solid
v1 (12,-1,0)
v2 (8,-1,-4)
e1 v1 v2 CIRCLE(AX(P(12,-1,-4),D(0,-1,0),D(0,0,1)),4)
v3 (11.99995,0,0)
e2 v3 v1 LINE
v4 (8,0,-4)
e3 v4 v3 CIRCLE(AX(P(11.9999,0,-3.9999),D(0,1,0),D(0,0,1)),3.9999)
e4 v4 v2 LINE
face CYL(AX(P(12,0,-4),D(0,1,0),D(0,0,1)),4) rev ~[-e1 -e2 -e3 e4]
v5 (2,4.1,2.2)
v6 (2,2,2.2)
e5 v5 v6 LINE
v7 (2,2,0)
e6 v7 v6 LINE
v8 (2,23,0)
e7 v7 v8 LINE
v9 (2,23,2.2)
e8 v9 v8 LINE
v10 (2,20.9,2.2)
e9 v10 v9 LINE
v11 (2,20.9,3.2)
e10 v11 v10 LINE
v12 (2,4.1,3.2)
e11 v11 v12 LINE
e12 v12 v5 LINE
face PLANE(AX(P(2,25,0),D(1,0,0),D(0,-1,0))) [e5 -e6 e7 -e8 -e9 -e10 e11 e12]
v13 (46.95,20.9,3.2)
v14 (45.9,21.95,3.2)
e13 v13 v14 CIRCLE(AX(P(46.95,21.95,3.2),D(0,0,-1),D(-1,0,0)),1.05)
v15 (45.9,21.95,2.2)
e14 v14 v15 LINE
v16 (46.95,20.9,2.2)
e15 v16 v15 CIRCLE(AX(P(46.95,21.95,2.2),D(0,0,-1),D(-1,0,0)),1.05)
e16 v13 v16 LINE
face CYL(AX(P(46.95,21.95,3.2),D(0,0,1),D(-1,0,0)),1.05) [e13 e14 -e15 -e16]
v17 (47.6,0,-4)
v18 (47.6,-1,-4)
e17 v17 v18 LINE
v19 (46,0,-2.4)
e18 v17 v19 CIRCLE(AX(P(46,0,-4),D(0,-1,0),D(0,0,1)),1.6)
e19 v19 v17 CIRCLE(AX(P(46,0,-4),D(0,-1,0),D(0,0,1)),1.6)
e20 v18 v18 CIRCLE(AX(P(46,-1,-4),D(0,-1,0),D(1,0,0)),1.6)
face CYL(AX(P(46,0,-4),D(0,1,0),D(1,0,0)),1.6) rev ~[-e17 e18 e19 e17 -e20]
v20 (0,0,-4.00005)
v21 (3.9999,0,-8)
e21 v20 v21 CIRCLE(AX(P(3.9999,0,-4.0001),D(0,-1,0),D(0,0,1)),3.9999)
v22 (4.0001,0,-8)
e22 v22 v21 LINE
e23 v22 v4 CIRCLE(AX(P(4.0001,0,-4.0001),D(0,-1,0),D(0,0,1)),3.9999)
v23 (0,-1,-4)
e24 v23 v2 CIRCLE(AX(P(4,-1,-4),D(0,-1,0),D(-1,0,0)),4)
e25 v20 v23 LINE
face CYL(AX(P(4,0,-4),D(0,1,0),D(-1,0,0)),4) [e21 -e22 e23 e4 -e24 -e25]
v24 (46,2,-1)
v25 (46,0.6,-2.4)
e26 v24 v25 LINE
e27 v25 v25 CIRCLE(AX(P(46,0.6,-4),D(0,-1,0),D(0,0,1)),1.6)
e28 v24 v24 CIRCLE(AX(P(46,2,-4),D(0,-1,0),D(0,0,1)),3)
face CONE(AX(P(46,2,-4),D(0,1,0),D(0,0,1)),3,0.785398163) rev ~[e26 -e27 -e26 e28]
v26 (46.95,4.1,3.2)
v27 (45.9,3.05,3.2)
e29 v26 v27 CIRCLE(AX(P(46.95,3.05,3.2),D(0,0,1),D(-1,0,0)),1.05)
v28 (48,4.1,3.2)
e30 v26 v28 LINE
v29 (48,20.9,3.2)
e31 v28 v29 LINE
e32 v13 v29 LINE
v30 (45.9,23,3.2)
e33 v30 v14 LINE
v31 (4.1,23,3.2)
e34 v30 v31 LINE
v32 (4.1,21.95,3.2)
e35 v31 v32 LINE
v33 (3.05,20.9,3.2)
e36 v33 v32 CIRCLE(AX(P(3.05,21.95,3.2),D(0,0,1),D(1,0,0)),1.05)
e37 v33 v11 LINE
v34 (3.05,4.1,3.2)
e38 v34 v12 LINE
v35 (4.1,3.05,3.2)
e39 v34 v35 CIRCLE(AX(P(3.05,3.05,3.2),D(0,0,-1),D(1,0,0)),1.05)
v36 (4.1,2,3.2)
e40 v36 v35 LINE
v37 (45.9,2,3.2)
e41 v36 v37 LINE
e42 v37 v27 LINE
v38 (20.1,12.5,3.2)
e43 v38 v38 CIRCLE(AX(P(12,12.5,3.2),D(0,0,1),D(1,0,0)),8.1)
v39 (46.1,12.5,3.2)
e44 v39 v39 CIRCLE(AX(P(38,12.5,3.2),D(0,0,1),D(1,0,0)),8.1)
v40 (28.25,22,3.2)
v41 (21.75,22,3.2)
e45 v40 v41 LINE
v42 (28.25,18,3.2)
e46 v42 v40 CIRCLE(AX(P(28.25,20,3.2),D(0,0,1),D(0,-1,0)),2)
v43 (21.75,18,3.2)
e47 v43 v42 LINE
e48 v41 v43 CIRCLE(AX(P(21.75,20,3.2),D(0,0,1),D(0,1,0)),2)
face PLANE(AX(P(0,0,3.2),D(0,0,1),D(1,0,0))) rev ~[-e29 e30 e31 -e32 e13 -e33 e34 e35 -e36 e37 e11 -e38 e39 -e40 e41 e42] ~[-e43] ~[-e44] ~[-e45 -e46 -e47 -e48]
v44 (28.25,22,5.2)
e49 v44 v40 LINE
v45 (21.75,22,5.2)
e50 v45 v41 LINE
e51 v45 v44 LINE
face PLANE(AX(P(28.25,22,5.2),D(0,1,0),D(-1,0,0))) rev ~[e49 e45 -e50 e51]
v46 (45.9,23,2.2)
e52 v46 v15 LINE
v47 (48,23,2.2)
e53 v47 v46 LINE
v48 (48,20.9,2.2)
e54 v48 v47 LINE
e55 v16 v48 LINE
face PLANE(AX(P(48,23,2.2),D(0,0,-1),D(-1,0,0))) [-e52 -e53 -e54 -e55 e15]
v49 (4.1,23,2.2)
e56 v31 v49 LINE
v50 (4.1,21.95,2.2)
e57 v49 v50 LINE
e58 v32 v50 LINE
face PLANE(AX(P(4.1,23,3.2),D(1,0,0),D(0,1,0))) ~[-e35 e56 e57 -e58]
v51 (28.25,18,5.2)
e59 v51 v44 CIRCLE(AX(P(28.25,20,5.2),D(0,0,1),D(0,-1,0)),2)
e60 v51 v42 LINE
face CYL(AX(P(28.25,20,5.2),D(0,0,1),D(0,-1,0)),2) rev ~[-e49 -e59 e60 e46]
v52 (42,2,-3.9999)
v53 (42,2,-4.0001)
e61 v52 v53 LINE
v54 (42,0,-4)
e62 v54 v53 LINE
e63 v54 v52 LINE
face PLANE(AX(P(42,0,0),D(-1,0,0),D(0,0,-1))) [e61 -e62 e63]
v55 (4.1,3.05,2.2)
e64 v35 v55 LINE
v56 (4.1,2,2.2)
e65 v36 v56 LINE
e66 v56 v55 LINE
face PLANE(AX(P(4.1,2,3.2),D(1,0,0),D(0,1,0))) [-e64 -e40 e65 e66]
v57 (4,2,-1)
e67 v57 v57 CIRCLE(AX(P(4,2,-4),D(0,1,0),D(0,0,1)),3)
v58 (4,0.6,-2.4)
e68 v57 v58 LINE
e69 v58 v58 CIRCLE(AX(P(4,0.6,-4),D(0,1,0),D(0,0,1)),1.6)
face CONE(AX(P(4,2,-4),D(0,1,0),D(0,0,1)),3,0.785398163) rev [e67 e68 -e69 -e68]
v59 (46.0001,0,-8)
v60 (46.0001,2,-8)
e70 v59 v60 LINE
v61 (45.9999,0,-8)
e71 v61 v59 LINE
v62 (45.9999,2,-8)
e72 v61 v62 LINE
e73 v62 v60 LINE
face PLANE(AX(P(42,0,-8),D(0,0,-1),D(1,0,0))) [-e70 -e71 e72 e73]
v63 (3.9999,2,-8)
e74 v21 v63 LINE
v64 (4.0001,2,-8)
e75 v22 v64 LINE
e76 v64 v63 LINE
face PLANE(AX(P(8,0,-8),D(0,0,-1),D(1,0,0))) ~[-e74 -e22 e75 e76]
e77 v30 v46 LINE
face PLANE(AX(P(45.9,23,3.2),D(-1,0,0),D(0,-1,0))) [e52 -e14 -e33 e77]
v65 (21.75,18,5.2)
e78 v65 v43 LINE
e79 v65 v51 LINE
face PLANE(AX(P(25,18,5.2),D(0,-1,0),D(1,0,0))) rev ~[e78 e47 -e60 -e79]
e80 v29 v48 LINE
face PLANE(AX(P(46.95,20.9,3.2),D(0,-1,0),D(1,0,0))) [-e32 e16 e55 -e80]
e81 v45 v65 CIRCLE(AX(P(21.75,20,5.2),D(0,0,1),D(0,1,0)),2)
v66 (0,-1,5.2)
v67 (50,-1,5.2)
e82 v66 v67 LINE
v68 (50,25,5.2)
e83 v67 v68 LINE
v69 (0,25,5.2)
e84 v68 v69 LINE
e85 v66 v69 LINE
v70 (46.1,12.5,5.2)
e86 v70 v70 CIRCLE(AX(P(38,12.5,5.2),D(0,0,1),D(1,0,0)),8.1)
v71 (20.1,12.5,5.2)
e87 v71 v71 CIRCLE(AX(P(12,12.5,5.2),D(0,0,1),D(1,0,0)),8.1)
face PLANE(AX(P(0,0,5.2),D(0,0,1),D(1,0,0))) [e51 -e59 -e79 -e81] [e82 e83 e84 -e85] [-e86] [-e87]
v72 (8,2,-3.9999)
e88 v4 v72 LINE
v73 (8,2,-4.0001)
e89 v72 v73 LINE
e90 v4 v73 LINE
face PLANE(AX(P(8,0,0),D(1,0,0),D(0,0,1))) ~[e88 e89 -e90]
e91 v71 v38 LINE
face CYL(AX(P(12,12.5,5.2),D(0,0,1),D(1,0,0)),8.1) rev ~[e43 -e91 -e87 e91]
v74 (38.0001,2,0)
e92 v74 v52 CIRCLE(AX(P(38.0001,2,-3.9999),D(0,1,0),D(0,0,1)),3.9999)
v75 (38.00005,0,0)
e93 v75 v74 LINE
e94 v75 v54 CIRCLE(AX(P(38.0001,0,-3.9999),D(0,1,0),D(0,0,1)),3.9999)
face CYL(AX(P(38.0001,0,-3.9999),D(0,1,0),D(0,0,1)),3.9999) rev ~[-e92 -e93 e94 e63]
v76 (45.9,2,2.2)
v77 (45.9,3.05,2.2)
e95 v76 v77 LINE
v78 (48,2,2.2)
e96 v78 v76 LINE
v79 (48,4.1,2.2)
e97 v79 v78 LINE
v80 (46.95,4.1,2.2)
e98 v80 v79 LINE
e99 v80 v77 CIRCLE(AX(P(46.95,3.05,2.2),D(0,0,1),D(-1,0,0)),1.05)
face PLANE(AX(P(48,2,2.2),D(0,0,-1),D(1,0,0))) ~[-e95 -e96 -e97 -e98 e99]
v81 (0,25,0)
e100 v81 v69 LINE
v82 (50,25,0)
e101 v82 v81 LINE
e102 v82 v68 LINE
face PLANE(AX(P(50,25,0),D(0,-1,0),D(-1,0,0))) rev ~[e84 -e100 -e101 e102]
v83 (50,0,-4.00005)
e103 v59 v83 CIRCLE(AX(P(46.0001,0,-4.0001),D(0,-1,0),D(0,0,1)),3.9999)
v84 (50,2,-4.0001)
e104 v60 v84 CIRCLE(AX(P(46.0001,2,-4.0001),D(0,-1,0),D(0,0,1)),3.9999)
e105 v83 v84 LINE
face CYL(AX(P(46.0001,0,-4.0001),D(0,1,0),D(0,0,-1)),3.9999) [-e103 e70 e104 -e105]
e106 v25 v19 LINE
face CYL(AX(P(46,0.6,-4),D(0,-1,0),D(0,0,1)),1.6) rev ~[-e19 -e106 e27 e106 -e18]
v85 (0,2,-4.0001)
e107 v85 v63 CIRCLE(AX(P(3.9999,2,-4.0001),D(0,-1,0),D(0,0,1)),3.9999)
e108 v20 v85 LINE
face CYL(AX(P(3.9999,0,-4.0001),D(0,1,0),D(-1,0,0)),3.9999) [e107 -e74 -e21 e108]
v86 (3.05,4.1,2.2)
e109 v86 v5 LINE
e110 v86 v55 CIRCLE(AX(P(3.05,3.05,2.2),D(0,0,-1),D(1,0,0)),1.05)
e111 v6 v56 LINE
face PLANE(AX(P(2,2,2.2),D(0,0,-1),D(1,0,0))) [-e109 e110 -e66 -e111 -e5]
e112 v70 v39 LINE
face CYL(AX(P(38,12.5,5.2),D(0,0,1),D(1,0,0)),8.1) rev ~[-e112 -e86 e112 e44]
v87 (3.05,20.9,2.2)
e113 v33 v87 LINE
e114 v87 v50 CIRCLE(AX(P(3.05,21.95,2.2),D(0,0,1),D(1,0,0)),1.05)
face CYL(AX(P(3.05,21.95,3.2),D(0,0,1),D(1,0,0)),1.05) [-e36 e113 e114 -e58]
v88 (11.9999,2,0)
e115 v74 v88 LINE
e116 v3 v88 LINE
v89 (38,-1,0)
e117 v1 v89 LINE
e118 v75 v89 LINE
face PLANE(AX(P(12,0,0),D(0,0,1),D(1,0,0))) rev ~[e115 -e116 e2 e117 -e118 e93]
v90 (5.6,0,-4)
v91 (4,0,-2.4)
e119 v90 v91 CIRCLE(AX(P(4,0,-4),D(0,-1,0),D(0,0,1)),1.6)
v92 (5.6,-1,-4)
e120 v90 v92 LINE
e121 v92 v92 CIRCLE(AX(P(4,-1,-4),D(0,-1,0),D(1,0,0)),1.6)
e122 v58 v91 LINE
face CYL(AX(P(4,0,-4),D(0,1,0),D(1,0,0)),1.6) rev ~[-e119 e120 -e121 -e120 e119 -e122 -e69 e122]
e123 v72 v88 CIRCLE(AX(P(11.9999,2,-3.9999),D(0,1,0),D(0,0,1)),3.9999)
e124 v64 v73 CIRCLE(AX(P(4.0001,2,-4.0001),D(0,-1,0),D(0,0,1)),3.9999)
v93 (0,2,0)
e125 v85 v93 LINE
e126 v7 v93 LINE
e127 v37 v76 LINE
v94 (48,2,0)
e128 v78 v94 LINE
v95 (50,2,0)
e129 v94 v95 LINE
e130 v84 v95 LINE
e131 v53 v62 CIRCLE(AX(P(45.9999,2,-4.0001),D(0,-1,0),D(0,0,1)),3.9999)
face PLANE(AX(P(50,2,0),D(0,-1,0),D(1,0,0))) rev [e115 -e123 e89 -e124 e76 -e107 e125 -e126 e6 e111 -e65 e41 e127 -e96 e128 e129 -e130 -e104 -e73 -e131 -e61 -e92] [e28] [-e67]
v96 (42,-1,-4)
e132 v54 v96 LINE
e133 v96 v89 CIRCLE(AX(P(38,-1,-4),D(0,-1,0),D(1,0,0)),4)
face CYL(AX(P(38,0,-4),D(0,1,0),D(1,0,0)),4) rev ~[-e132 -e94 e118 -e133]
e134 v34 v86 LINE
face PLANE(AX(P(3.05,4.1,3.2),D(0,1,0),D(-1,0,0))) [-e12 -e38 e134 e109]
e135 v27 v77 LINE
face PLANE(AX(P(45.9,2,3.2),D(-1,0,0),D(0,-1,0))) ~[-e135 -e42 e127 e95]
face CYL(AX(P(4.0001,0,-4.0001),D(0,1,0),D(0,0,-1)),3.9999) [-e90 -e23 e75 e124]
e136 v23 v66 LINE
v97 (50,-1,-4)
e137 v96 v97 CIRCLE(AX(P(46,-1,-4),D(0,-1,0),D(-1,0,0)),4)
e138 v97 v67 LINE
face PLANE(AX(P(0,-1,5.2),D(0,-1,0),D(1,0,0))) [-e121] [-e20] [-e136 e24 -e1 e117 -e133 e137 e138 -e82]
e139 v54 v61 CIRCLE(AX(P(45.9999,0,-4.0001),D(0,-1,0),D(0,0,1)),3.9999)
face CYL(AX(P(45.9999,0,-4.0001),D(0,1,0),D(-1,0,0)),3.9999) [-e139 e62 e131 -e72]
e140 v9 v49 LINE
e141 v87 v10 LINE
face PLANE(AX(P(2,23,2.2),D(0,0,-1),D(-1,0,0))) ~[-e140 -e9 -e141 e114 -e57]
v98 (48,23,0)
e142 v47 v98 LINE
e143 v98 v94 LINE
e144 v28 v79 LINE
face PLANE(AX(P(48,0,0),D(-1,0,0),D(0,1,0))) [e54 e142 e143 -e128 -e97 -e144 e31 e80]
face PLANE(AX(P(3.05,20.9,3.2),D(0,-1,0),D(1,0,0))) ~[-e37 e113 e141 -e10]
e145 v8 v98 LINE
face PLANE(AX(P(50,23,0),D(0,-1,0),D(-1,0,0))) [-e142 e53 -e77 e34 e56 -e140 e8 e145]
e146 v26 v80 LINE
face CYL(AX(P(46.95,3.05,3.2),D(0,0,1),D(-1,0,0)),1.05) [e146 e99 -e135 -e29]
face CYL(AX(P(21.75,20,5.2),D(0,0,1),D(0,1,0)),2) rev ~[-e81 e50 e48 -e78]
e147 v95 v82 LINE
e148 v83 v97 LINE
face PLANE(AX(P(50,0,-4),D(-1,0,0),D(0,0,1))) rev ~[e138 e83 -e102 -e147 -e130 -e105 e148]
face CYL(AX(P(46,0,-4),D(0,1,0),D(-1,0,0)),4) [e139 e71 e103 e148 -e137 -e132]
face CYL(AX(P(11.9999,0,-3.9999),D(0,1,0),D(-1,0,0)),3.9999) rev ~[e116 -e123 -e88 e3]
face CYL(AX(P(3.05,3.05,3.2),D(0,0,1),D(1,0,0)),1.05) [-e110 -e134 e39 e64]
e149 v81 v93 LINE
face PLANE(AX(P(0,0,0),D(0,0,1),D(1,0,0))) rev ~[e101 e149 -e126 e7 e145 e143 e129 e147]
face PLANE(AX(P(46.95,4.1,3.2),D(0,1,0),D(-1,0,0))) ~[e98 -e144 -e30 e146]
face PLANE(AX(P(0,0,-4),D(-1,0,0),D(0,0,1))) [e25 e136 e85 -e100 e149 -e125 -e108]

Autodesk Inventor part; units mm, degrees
sketch "Эскиз1" plane through (0, 0, 0) normal (0, 0, 1) x (1, 0, 0)
  line L0 (0, 0) -> (50, 0)
  line L1 (50, 0) -> (50, 25)
  line L2 (50, 25) -> (0, 25)
  line L3 (0, 25) -> (0, 0)
  dimension "d0" = 50
  dimension "d1" = 25
extrude "Выдавливание1" add sketch "Эскиз1" along normal blind 5.2
shell "Оболочка1" thickness 2 removed faces 1 at (16.6667, 16.6667, 0)
sketch "Эскиз2" plane through (0, 0, 5.2) normal (0, 0, 1) x (1, 0, 0)
  line L0 (50, 25) -> (0, 25) projected
  line L1 (25, 25) -> (25, 0)
  line L2 (0, 0) -> (50, 0) projected
  line L3 (25, 12.5) -> (12, 12.5)
  line L4 (0, 25) -> (0, 0) projected
  circle A0 centre (12, 12.5) radius 8.1
  circle A1 centre (38, 12.5) radius 8.1
  line L5 (25, 25) -> (25, 20)
  line L6 (21.75, 20) -> (28.25, 20) construction
  line L7 (21.75, 18) -> (28.25, 18)
  line L8 (28.25, 22) -> (21.75, 22)
  arc A2 (21.75, 22) -> (21.75, 18) centre (21.75, 20) ccw
  arc A3 (28.25, 18) -> (28.25, 22) centre (28.25, 20) ccw
  point P0 (25, 18)
  point P1 (25, 22)
  dimension "d5" = 13
  dimension "d6" = 16.2
  dimension "d9" = 5
  dimension "d10" = 3.25
  dimension "d11" = 4
extrude "Выдавливание2" cut sketch "Эскиз2" against normal through all contours L8 A3 L7 L1 | L1 L7 A2 L8 | A0 | A1
sketch "Эскиз5" plane through (48, 23, 3.2) normal (0, 0, -1) x (-1, 0, 0)
  line L0 (0, 0) -> (1.05, 0)
  line L1 (0, 0) -> (46, 0) projected
  line L2 (1.05, 0) -> (1.05, -1.05)
  circle A0 centre (1.05, -1.05) radius 1.05
  line L3 (2.1, -2.1) -> (0, -2.1)
  line L4 (0, -2.1) -> (0, 0)
  line L5 (0, 0) -> (2.1, 0)
  line L6 (2.1, 0) -> (2.1, -2.1)
  line L7 (2.1, -2.1) -> (0, 0) construction
  line L8 (0, -2.1) -> (2.1, 0) construction
  point P0 (48, -23)
  point P1 (1.05, -2.1)
  point P2 (2.1, -1.05)
  dimension "d17" = 1.05
  dimension "d18" = 1.05
extrude "Выдавливание4" add sketch "Эскиз5" along normal blind 1 contours L0 A0 L4 | L1 L6 A0 | A0 | A0 L3 L4
ref_plane "РабПлоскость1" through (25, 2, 0) normal (1, 0, 0) x (0, 0, -1)
ref_plane "РабПлоскость2" through (2, 12.5, 0) normal (0, -1, 0) x (1, 0, 0)
mirror "Зеркальное отражение1" about plane through (2, 12.5, 0) normal (0, -1, 0) of "Выдавливание4"
mirror "Зеркальное отражение2" about plane through (25, 2, 0) normal (1, 0, 0) of "Выдавливание4", "Зеркальное отражение1"
sketch "Эскиз10" plane through (0, 0, 0) normal (0, -1, 0) x (1, 0, 0)
  line L0 (0, 0) -> (50, 0) projected
  line L1 (50, 0) -> (42, 0)
  line L2 (42, 0) -> (42, -8)
  line L3 (42, -8) -> (50, -8)
  line L4 (50, -8) -> (50, 0)
  dimension "d39" = 8
  dimension "d40" = 8
extrude "Выдавливание8" add sketch "Эскиз10" against normal up to surface (2 mm away)
sketch "Эскиз11" plane through (48, 2, 0) normal (0, 1, 0) x (1, 0, 0)
  line L0 (-6, 0) -> (-6, 8) projected
  line L1 (-6, 4) -> (2, 4)
  line L2 (2, 0) -> (2, 8) projected
  line L3 (-6, 8) -> (-6, 0) projected
  point P0 (-48, 0)
  point P1 (-2, 4)
hole "Отверстие2" at (46, 2, -4) direction (0, -1, 0) diameter 3.2 end through all countersink diameter 6 countersink angle 90
ref_plane "РабПлоскость3" through (25, 25, 5.2) normal (1, 0, 0) x (0, 0, -1)
mirror "Зеркальное отражение4" about plane through (25, 25, 5.2) normal (1, 0, 0) of "Отверстие2", "Выдавливание8"
fillet "Сопряжение2" radius 4 6 edges at (42, 1, -8) (50, 1, -8) (8, 1, -8) (0, 1, -8) (8, 1, 0) (42, 1, 0)
sketch "Эскиз12" plane through (0, 0, 5.2) normal (0, -1, 0) x (1, 0, 0)
  circle A0 centre (46, -9.2) radius 1.6 projected
  circle A1 centre (4, -9.2) radius 1.6 projected
  arc A2 (0, -9.2) -> (8, -9.2) centre (4, -9.2) ccw projected
  arc A3 (12, -5.2) -> (8, -9.2) centre (12, -9.2) ccw projected
  line L0 (12, -5.2) -> (38, -5.2) projected
  arc A4 (42, -9.2) -> (38, -5.2) centre (38, -9.2) ccw projected
  arc A5 (42, -9.2) -> (50, -9.2) centre (46, -9.2) ccw projected
  line L1 (50, -9.2) -> (50, 0) projected
  line L2 (0, 0) -> (50, 0) projected
  line L3 (0, -9.2) -> (0, 0) projected
  point P0 (0, -5.2)
extrude "Выдавливание9" add sketch "Эскиз12" along normal blind 1
properties part number "Крепление ультрасоника"
